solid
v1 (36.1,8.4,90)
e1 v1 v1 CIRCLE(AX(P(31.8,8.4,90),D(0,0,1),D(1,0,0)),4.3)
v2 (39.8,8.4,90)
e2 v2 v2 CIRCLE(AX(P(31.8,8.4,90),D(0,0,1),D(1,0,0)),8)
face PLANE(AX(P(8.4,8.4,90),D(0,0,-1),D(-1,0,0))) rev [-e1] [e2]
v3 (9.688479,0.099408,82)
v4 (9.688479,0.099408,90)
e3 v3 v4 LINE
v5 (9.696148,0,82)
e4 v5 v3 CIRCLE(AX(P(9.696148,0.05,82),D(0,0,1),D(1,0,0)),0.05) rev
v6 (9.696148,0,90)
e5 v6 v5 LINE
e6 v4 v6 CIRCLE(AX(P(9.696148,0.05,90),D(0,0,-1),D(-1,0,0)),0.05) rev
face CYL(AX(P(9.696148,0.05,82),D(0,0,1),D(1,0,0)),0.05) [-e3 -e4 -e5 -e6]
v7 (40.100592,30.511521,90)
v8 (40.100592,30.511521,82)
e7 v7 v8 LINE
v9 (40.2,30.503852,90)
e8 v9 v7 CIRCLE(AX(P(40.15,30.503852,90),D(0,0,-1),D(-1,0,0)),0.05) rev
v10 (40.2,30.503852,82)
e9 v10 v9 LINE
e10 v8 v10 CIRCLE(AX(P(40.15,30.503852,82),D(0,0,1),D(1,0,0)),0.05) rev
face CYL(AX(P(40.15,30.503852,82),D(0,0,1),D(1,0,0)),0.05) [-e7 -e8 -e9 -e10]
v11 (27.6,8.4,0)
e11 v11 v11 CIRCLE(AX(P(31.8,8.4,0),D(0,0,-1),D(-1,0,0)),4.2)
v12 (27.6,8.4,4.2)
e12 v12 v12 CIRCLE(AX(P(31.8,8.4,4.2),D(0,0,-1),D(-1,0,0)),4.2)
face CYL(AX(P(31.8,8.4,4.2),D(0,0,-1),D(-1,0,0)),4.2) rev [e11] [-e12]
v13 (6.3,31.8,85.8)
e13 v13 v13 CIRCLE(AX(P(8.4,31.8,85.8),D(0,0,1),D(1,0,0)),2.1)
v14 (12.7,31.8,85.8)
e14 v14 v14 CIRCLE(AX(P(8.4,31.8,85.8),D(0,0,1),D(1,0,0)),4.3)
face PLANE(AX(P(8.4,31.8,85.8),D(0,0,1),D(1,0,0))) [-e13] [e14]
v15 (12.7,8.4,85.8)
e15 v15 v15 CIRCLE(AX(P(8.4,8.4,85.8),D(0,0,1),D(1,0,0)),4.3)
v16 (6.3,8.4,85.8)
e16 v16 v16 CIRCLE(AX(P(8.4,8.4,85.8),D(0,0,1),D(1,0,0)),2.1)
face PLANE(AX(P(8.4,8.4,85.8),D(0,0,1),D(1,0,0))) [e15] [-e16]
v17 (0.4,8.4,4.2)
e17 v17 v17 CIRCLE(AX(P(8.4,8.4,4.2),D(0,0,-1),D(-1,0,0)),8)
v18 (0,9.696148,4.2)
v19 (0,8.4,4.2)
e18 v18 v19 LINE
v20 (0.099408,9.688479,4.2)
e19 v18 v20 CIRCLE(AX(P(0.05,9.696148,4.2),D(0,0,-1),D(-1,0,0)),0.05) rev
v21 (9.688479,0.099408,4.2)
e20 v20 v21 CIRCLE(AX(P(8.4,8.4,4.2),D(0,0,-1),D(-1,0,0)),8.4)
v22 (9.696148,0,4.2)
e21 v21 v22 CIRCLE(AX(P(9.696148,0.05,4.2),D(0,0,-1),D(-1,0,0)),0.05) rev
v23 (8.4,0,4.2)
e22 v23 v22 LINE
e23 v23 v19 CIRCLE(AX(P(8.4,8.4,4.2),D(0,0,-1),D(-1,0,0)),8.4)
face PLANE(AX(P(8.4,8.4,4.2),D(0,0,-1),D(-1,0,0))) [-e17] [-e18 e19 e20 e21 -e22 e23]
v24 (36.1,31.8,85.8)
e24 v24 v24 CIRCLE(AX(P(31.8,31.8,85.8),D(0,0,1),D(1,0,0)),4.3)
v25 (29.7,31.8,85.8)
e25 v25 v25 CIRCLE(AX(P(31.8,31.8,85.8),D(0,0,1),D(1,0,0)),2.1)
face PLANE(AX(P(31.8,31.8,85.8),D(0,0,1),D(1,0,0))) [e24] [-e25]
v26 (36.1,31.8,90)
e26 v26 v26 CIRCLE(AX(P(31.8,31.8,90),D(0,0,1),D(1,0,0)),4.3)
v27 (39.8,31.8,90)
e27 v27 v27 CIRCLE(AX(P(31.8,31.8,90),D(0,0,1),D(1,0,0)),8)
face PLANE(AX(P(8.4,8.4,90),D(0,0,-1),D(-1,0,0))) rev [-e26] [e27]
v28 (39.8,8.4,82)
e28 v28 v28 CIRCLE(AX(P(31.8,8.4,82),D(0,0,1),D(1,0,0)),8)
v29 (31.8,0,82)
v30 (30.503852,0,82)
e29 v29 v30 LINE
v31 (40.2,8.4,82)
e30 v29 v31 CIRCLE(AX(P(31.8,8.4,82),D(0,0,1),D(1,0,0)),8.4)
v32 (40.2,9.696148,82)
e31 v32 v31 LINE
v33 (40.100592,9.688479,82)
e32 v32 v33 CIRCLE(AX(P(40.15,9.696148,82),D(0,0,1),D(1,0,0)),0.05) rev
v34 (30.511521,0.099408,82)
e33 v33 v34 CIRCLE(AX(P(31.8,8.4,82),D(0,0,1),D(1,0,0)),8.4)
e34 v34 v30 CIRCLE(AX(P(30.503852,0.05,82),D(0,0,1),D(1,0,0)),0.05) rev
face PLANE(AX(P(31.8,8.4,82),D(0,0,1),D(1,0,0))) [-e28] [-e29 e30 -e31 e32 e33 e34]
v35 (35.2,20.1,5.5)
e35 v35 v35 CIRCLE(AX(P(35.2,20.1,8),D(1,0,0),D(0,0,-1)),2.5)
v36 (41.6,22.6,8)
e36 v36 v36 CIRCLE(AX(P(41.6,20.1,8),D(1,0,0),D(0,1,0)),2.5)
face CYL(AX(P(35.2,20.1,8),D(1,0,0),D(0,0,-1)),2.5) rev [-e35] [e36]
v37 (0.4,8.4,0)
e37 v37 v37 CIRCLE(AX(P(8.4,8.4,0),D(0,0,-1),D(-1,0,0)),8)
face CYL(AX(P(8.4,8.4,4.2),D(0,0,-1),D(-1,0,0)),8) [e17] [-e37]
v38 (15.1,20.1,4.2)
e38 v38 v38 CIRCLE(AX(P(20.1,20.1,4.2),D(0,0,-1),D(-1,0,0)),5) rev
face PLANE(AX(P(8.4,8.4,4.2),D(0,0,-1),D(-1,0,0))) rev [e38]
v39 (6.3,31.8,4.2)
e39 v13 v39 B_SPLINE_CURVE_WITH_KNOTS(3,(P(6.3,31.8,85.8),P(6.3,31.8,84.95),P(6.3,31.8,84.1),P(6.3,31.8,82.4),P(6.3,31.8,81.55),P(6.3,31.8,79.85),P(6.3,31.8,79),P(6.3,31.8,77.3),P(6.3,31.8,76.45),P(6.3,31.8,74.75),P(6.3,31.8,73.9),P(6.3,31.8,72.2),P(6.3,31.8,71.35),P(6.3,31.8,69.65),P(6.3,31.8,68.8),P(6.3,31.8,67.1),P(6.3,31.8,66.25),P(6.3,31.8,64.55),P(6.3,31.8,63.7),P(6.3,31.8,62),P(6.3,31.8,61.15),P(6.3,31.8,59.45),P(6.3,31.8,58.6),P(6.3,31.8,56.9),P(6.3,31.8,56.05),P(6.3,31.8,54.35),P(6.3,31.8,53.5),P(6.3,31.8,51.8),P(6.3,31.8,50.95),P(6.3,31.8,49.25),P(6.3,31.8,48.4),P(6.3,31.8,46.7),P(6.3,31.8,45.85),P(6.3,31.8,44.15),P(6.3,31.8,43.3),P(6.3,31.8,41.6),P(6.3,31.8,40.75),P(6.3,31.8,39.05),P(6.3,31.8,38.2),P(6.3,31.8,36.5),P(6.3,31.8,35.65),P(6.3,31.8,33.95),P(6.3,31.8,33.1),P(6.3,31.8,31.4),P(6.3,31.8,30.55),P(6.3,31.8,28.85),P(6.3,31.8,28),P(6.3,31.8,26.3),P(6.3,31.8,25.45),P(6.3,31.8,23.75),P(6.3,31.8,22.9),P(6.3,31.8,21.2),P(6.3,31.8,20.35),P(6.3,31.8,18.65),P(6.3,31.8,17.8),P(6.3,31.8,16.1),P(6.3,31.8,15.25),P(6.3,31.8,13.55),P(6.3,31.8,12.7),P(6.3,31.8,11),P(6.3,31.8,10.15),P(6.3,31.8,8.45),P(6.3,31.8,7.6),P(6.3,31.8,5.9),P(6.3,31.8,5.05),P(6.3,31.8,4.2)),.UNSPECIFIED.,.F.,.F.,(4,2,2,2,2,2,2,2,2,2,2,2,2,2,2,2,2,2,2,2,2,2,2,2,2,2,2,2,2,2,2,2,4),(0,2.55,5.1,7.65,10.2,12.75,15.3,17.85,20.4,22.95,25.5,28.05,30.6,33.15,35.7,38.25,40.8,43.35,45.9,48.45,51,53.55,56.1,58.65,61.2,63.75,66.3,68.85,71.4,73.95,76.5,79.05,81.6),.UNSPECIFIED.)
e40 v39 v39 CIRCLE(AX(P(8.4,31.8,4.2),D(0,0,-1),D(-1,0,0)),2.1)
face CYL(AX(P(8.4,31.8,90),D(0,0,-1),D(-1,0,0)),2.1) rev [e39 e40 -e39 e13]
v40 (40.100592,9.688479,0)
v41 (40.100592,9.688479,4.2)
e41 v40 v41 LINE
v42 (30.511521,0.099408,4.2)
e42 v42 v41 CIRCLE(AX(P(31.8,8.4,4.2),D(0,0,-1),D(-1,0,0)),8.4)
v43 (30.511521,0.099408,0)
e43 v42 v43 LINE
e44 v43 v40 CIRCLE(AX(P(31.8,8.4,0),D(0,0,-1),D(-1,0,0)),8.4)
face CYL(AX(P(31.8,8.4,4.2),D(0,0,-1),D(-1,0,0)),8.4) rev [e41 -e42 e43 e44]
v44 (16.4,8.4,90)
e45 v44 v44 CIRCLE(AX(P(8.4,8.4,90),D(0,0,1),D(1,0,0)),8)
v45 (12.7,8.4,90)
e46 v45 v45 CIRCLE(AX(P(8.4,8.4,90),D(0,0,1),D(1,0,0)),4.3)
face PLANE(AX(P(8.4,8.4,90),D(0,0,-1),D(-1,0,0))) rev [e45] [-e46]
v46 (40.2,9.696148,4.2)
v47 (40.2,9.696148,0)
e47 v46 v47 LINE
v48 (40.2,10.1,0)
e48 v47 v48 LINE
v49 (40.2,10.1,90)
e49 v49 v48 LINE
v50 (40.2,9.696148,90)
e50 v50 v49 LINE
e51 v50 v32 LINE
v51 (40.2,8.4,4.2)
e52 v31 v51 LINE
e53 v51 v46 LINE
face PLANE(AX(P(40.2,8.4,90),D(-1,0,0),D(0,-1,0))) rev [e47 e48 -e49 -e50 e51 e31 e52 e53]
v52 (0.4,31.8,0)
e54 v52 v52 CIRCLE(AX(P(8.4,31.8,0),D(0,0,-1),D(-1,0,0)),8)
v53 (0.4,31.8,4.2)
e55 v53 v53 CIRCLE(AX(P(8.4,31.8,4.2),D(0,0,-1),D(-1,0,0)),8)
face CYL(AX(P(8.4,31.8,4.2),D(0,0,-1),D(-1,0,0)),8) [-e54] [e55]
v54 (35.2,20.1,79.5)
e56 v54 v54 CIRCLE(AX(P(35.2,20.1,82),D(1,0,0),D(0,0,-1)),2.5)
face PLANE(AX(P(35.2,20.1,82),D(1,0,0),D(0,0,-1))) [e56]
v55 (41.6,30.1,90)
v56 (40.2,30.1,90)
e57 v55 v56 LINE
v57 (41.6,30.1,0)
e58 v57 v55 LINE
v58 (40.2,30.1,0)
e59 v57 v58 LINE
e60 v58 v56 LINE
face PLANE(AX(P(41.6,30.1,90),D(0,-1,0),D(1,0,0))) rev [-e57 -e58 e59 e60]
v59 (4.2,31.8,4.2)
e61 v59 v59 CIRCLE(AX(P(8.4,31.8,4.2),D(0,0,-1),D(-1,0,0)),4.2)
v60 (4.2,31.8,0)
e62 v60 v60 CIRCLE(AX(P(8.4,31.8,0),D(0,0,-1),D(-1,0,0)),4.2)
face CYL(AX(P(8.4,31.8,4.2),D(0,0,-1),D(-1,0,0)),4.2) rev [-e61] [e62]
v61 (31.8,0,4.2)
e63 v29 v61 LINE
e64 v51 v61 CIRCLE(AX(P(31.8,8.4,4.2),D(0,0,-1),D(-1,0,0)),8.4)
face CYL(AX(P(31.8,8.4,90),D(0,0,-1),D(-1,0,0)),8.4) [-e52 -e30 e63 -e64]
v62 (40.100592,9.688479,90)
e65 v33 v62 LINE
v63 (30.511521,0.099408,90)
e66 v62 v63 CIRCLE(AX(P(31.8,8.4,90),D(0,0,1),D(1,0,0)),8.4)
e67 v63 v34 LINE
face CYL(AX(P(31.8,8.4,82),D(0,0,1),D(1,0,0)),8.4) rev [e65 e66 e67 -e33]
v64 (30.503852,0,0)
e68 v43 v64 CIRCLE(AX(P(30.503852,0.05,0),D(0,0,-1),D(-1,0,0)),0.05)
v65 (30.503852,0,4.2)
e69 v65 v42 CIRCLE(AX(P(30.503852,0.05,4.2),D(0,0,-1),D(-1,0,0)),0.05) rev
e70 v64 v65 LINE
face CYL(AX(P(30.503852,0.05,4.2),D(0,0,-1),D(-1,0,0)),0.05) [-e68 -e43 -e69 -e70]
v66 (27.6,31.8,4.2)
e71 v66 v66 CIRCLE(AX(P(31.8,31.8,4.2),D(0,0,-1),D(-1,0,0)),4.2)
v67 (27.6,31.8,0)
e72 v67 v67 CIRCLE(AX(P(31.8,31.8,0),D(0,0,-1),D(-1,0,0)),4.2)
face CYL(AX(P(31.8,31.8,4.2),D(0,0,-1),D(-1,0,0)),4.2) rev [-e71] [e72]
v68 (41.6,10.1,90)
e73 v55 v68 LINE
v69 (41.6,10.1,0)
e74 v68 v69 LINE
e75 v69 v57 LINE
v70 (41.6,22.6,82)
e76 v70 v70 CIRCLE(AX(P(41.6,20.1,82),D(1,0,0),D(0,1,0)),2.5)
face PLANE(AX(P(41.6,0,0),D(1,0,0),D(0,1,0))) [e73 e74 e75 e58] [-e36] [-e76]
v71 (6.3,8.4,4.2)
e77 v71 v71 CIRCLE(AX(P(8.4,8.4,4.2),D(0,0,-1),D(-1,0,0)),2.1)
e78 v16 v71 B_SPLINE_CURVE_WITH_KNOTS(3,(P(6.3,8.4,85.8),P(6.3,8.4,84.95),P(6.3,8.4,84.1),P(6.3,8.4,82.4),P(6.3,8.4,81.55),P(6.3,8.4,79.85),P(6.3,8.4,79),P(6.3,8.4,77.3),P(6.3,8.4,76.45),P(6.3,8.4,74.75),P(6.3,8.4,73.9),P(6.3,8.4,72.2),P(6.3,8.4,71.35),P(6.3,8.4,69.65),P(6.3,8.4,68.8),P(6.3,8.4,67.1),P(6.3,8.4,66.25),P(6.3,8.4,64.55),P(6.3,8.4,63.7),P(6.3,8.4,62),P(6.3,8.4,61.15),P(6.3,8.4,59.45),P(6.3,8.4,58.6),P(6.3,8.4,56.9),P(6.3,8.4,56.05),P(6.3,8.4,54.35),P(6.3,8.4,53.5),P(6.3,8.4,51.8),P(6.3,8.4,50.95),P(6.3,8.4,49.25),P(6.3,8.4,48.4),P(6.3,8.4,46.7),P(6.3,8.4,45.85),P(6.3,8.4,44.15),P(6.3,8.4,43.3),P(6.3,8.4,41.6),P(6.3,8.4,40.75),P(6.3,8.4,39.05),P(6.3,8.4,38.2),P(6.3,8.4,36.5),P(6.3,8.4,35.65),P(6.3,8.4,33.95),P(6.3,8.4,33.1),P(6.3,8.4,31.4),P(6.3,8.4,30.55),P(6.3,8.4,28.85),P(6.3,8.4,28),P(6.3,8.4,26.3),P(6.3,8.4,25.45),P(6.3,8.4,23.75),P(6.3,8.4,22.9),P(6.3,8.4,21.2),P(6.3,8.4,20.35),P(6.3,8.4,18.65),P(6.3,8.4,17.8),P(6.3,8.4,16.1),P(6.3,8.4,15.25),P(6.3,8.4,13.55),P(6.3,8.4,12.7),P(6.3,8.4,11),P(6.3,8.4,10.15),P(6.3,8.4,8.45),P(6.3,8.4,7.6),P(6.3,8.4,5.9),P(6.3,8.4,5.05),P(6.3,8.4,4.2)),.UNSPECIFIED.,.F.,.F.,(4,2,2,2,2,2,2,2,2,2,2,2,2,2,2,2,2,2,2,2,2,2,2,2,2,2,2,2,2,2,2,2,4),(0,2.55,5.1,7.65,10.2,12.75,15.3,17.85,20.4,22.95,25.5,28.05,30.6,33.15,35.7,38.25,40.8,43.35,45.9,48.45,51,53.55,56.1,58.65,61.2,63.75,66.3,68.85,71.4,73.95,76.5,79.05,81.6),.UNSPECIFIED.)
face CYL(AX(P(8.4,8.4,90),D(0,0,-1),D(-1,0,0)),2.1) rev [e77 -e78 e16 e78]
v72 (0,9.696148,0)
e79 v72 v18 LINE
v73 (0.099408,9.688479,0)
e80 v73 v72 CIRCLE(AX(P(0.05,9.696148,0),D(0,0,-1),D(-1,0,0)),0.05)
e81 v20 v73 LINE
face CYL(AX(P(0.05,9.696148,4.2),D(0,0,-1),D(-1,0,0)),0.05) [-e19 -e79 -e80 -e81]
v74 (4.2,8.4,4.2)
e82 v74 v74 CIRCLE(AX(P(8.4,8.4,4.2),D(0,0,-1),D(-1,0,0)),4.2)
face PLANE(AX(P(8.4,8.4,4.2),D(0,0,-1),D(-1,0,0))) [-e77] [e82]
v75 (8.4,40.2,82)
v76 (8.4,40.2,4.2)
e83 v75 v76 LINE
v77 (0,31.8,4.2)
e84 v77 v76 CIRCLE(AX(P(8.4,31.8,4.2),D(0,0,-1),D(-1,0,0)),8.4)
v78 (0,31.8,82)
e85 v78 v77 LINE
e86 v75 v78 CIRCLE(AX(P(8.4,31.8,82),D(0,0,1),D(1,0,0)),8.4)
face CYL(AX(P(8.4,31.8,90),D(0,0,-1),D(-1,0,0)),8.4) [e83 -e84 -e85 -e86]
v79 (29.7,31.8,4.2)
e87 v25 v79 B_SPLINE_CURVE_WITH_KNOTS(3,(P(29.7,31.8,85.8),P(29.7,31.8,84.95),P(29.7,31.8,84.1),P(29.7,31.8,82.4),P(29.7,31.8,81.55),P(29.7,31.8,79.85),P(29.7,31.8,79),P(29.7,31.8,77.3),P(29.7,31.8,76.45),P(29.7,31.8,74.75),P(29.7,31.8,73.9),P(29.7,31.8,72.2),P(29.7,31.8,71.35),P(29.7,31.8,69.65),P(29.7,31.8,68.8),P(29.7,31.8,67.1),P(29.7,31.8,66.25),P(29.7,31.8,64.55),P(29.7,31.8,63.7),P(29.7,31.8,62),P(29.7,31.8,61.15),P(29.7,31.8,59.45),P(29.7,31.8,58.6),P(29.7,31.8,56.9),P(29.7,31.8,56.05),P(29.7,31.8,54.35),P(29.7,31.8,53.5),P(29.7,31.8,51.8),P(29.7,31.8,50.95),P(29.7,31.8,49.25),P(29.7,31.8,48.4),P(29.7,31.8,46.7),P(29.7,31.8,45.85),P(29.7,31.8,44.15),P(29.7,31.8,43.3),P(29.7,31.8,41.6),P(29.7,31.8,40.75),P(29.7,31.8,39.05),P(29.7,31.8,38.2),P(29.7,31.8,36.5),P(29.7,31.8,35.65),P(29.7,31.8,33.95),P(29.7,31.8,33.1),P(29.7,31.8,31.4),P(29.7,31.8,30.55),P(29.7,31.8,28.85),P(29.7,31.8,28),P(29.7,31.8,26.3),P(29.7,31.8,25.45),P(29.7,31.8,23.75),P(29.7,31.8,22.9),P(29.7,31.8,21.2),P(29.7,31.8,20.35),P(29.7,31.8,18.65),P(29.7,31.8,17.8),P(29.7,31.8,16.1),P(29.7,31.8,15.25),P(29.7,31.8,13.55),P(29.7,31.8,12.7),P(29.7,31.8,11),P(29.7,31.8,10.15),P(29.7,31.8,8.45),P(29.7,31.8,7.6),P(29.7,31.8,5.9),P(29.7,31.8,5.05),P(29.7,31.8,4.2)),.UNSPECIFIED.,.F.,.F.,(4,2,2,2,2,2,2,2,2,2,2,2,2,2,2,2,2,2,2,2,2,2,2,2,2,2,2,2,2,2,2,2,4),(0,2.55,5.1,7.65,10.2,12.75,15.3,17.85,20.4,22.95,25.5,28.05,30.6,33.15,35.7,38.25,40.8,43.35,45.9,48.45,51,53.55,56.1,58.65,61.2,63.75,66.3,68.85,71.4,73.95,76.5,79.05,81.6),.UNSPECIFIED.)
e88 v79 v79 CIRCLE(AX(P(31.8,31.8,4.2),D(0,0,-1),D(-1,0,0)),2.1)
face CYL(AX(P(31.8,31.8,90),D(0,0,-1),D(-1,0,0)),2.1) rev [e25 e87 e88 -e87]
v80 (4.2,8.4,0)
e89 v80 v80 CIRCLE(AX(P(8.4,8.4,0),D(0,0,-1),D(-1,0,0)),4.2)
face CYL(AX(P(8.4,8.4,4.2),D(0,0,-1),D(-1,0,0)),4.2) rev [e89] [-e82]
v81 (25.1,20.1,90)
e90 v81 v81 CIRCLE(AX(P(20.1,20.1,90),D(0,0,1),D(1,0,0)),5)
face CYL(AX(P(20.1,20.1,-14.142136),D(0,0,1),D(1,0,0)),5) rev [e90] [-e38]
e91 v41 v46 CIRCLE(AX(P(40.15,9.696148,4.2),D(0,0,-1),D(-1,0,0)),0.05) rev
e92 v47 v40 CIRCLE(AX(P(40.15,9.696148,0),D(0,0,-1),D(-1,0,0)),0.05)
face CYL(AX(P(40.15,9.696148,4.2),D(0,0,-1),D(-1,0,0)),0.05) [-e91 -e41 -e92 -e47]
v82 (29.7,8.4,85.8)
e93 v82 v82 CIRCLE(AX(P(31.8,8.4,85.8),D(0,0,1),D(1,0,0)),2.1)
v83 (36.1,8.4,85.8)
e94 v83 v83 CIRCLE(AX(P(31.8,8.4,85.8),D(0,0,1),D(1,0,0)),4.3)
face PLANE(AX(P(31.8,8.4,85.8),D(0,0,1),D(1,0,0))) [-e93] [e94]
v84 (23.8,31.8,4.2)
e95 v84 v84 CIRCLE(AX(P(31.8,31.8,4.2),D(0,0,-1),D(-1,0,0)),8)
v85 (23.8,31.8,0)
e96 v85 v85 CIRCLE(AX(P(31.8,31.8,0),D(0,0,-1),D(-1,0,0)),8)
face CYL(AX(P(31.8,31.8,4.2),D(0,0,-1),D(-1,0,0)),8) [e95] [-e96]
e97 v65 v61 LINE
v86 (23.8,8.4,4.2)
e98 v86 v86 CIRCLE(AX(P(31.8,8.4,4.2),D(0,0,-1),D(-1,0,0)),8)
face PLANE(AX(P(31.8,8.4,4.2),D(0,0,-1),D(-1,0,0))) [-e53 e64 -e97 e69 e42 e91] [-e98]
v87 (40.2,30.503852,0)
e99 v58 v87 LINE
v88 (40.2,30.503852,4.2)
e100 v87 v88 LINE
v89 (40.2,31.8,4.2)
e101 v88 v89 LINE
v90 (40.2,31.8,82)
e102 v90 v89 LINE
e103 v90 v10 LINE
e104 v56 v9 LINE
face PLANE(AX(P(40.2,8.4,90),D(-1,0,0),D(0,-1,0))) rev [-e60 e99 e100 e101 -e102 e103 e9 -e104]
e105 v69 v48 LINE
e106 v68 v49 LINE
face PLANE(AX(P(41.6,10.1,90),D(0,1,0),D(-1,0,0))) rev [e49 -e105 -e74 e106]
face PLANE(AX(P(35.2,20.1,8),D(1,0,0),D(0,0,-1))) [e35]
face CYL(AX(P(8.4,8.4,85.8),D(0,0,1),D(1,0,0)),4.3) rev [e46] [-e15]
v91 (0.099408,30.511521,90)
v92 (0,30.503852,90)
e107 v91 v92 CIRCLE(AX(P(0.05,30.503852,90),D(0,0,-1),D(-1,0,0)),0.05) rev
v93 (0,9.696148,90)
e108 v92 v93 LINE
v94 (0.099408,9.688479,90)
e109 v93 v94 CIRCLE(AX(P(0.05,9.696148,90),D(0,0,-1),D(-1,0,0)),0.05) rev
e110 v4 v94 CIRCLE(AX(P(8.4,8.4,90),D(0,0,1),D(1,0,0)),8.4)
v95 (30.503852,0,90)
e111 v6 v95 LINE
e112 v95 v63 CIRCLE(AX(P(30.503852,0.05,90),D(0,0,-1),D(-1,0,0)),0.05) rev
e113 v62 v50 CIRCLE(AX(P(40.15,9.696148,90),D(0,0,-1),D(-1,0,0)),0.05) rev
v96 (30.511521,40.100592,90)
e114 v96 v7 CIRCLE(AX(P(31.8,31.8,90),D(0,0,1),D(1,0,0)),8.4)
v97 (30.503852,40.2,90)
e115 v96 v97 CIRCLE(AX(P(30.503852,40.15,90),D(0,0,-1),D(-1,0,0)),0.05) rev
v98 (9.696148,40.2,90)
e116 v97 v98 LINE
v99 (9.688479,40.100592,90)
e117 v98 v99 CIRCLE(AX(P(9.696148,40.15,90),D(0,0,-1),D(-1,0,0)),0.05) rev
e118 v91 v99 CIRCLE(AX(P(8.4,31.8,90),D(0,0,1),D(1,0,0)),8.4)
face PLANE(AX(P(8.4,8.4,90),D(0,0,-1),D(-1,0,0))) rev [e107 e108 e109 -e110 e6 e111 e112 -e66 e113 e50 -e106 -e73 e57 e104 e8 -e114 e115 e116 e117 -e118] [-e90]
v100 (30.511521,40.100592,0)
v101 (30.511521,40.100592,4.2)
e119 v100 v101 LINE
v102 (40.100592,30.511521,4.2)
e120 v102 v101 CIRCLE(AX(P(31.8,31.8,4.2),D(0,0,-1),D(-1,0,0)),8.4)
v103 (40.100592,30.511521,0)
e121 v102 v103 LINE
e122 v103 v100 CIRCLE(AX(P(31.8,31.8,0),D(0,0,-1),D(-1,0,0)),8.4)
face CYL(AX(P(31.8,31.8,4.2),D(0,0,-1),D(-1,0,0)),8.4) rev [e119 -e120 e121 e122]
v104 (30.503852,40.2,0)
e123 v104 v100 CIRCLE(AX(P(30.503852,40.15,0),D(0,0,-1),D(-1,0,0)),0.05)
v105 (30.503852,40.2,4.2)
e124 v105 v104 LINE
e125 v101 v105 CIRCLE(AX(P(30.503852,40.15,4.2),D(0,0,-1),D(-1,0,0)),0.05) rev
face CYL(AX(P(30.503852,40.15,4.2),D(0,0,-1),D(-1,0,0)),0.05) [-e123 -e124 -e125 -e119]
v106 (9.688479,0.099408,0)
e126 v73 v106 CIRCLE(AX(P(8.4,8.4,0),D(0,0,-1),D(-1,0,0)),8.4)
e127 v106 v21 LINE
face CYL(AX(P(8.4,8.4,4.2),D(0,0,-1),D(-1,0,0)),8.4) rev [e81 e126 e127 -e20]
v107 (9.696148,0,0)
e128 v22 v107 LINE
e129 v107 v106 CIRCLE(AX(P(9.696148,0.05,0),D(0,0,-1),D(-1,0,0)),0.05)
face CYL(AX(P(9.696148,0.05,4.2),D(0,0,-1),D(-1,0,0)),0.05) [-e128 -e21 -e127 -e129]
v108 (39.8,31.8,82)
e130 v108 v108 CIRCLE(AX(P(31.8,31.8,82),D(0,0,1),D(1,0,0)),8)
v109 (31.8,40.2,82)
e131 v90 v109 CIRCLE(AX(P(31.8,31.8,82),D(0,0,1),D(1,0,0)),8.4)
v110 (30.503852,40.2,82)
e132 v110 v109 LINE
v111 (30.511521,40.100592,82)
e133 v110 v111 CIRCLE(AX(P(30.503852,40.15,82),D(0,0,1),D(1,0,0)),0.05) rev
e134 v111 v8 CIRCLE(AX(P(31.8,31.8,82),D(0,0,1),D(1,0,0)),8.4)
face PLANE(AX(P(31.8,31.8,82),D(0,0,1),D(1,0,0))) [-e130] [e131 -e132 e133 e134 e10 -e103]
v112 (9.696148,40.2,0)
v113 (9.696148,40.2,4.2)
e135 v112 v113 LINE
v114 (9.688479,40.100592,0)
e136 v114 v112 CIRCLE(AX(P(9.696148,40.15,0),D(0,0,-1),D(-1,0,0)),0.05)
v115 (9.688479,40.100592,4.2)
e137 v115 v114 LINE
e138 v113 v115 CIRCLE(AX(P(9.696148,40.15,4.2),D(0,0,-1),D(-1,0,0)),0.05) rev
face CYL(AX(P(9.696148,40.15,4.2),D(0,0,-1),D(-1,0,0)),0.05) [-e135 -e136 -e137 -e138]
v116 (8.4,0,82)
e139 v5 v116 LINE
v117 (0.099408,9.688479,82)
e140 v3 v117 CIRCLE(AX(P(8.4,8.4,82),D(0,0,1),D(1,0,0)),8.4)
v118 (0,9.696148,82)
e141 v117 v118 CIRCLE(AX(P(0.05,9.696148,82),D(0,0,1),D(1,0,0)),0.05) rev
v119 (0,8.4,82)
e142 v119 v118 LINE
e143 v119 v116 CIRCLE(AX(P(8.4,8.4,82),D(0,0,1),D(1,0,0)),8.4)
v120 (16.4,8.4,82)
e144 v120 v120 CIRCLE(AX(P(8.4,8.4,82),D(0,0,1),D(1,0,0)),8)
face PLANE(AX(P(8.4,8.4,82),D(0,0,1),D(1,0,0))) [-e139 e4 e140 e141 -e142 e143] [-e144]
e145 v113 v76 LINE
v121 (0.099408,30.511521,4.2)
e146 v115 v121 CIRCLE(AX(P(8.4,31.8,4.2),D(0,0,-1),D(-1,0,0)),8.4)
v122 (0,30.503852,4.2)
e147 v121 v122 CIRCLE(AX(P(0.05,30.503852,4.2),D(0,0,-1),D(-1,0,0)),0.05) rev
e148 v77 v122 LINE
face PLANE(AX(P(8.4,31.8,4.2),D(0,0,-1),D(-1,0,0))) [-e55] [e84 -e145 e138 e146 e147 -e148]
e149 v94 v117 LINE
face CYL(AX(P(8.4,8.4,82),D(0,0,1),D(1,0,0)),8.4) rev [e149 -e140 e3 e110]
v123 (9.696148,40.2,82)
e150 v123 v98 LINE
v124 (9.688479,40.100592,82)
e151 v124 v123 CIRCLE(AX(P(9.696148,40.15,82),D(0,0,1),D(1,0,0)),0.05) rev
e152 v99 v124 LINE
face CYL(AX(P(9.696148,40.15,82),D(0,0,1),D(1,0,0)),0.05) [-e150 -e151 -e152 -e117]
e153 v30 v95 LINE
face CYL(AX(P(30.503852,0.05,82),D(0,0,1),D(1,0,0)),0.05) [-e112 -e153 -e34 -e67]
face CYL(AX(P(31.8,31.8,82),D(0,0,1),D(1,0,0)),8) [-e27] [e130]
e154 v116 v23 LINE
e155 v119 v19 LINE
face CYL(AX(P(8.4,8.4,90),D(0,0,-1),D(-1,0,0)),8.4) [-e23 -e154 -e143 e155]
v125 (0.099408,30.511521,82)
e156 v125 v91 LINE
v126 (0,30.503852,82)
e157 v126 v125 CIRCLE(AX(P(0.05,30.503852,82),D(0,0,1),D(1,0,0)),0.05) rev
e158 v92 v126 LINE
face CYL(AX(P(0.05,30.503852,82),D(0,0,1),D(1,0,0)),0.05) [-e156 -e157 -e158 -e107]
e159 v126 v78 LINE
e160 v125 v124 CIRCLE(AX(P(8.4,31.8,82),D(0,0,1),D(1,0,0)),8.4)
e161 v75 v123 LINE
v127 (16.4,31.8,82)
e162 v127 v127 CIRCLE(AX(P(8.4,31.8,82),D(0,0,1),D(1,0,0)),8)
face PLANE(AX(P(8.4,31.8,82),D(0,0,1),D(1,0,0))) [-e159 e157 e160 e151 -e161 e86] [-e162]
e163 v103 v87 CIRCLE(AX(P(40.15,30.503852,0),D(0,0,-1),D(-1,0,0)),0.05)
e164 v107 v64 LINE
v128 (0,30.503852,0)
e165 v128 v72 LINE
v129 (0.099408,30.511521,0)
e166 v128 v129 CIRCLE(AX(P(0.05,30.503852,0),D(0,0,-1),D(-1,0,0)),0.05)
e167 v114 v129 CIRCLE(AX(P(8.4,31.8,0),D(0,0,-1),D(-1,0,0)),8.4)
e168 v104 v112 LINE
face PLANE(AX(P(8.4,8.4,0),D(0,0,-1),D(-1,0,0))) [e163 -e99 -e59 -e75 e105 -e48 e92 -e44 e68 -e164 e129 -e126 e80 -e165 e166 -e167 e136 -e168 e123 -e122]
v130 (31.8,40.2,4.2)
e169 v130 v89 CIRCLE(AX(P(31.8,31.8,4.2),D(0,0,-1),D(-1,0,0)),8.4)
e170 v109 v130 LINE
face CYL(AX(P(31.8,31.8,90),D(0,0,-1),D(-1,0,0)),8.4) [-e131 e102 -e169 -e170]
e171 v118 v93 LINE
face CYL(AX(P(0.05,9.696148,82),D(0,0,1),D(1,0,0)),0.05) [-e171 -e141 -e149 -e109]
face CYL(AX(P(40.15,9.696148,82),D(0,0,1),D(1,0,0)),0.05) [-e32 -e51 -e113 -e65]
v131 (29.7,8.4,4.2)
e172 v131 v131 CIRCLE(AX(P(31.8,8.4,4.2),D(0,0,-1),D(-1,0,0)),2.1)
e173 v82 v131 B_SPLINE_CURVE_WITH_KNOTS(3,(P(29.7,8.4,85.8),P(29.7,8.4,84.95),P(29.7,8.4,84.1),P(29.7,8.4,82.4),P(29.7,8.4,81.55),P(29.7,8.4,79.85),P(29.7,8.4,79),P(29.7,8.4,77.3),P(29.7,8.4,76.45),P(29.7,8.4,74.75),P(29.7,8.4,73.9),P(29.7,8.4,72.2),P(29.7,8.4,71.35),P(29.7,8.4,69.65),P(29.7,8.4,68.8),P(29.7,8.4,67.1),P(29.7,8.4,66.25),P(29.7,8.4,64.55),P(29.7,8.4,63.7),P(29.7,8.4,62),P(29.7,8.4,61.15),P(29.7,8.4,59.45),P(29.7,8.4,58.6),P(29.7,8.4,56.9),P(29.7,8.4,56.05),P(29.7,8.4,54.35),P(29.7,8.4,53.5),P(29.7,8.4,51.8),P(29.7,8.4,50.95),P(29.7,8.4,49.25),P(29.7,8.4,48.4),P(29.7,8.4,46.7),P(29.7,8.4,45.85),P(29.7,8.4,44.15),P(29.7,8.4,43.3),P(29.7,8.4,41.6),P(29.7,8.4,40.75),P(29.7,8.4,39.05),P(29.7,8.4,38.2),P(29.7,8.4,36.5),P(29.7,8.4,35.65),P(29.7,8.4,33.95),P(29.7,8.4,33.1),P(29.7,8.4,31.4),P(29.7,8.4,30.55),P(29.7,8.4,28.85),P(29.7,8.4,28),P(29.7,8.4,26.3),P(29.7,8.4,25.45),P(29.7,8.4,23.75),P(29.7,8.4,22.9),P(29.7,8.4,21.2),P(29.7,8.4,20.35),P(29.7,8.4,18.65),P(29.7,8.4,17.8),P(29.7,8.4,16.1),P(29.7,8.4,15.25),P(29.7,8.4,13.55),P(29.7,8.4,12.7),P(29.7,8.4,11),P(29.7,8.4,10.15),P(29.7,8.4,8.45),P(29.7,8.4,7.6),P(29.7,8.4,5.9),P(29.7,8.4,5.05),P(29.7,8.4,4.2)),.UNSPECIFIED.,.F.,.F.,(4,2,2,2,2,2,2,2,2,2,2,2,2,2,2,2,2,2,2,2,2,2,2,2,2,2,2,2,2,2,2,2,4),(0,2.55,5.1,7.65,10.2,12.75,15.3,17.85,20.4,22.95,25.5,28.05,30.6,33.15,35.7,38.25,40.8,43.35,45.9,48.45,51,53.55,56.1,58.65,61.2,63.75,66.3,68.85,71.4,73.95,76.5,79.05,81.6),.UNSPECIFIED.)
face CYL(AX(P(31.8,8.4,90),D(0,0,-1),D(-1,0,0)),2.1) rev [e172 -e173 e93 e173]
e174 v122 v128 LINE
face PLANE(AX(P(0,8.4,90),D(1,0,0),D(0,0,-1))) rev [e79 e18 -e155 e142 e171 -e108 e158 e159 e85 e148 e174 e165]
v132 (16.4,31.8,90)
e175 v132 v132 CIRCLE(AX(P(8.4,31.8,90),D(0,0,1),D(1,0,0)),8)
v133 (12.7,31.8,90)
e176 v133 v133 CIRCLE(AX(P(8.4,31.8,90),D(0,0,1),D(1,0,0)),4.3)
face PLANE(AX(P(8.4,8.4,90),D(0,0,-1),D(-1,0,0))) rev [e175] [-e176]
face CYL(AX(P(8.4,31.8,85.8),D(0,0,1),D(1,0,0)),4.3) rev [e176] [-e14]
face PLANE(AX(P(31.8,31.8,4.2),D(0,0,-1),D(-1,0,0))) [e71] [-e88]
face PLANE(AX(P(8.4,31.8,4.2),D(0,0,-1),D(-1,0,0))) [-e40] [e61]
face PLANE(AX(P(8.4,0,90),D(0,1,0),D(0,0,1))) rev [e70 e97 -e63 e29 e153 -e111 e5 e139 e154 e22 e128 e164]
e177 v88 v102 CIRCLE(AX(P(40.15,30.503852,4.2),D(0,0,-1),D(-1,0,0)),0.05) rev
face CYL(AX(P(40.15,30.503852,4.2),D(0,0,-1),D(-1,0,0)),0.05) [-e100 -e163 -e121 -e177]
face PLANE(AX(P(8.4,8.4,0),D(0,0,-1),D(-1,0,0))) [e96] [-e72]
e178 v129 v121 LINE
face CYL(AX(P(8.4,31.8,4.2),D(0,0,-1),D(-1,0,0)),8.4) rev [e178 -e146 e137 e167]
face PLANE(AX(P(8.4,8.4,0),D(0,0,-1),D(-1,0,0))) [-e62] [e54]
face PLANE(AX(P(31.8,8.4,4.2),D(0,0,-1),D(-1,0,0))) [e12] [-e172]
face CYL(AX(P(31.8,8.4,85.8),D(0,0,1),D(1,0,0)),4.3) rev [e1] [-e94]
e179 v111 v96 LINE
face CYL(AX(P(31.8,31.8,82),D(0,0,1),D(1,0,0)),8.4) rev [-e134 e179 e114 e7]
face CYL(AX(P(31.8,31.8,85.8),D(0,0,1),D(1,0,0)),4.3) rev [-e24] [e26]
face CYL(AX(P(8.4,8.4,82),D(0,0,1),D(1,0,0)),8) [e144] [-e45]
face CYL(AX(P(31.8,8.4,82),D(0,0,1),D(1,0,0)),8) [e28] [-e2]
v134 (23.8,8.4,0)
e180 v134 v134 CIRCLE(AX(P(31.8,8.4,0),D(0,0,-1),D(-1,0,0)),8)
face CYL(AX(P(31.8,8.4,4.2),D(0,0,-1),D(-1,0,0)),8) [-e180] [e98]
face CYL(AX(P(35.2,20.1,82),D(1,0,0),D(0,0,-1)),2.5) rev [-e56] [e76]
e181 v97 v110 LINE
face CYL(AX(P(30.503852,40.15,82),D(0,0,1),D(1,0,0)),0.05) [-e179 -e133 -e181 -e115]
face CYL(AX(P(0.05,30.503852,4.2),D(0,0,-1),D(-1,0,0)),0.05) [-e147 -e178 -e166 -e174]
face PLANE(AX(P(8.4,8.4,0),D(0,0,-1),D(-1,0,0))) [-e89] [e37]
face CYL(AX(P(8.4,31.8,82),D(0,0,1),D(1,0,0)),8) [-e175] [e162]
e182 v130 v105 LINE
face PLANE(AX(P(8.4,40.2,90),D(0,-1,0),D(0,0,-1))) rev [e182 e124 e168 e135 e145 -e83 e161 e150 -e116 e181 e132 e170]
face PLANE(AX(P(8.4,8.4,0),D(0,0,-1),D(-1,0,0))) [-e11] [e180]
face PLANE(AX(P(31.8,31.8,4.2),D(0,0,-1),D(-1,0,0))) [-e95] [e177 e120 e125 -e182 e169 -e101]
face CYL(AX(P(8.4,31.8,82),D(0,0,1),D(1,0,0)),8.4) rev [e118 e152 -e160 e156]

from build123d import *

# Parameters (mm, degrees)
SKETCH1_R           = 2.1
BOSS_EXTRUDE1_DEPTH = 90
SKETCH5_R           = 2.5
CUT_EXTRUDE1_DEPTH  = 5
SKETCH6_R           = 8.4
SKETCH6_R_2         = 8
CUT_EXTRUDE2_DEPTH  = 4.2
FILLET1_START       = -1
FILLET1_DEPTH       = 5.2
CUT_EXTRUDE3_START  = -8
SKETCH7_R           = 8.4
SKETCH7_R_2         = 8
CUT_EXTRUDE3_DEPTH  = 8
SKETCH8_R           = 4.3
CUT_EXTRUDE4_DEPTH  = 4.2
FILLET2_START       = 82
FILLET2_DEPTH       = 9
SKETCH9_R           = 5
CUT_EXTRUDE5_DEPTH  = 85.8
SKETCH10_R          = 4.2
CUT_EXTRUDE6_DEPTH  = 4.2
BOSS_EXTRUDE2_START = 1.4
SKETCH11_W          = 90
SKETCH11_H          = 20
SKETCH11_R          = 2.5
BOSS_EXTRUDE2_DEPTH = 1.4


with BuildPart() as part:
    # Sketch1 → Boss-Extrude1 (new body)
    with BuildSketch(Plane.XY):
        with BuildLine():
            Line((8.4, 0), (31.8, 0))
            ThreePointArc((31.8, 0), (37.739696962, 2.460303038), (40.2, 8.4))
            Line((40.2, 8.4), (40.2, 31.8))
            ThreePointArc((40.2, 31.8), (37.739696962, 37.739696962), (31.8, 40.2))
            Line((31.8, 40.2), (8.4, 40.2))
            ThreePointArc((8.4, 40.2), (2.460303038, 37.739696962), (0, 31.8))
            Line((0, 31.8), (0, 8.4))
            ThreePointArc((0, 8.4), (2.460303038, 2.460303038), (8.4, 0))
        make_face()
        with Locations(Location((8.4, 31.8, 0), (0, 0, 180))):
            Circle(SKETCH1_R, mode=Mode.SUBTRACT)
        with Locations(Location((31.8, 31.8, 0), (0, 0, 180))):
            Circle(SKETCH1_R, mode=Mode.SUBTRACT)
        with Locations(Location((31.8, 8.4, 0), (0, 0, 180))):
            Circle(SKETCH1_R, mode=Mode.SUBTRACT)
        with Locations(Location((8.4, 8.4, 0), (0, 0, 180))):
            Circle(SKETCH1_R, mode=Mode.SUBTRACT)
    extrude(amount=BOSS_EXTRUDE1_DEPTH)

    # Sketch5 → Cut-Extrude1 (cut)
    with BuildSketch(Plane(origin=(40.2, 0, 0), x_dir=(0, 0, -1), z_dir=(1, 0, 0))):
        with Locations((-82, 20.1)):
            Circle(SKETCH5_R)
        with Locations((-8, 20.1)):
            Circle(SKETCH5_R)
    extrude(amount=-CUT_EXTRUDE1_DEPTH, mode=Mode.SUBTRACT)

    # Sketch6 → Cut-Extrude2 (cut)
    # profile 1 of 4: a face of its own
    with BuildSketch(Plane(origin=(0, 0, 0), x_dir=(-1, 0, 0), z_dir=(0, 0, -1))):
        with Locations((-31.8, 31.8)):
            Circle(SKETCH6_R)
        with Locations((-31.8, 31.8)):
            Circle(SKETCH6_R_2, mode=Mode.SUBTRACT)
    # profile 2 of 4: a face of its own
    with BuildSketch(Plane(origin=(0, 0, 0), x_dir=(-1, 0, 0), z_dir=(0, 0, -1))):
        with Locations((-8.4, 31.8)):
            Circle(SKETCH6_R)
        with Locations((-8.4, 31.8)):
            Circle(SKETCH6_R_2, mode=Mode.SUBTRACT)
    # profile 3 of 4: a face of its own
    with BuildSketch(Plane(origin=(0, 0, 0), x_dir=(-1, 0, 0), z_dir=(0, 0, -1))):
        with Locations((-8.4, 8.4)):
            Circle(SKETCH6_R)
        with Locations((-8.4, 8.4)):
            Circle(SKETCH6_R_2, mode=Mode.SUBTRACT)
    # profile 4 of 4: a face of its own
    with BuildSketch(Plane(origin=(0, 0, 0), x_dir=(-1, 0, 0), z_dir=(0, 0, -1))):
        with Locations((-31.8, 8.4)):
            Circle(SKETCH6_R)
        with Locations((-31.8, 8.4)):
            Circle(SKETCH6_R_2, mode=Mode.SUBTRACT)
    extrude(amount=-CUT_EXTRUDE2_DEPTH, mode=Mode.SUBTRACT)

    # Fillet1: read off the stored shape, not the designer's step
    # Fillet1 outline → Fillet1 (cut)
    with BuildSketch(Plane.XY.offset(FILLET1_START)):
        with BuildLine():
            ThreePointArc((0, 8.4), (0.024888944, 9.046153846), (0.099408284, 9.688478624))
            ThreePointArc((0.099408284, 9.688478624), (0.046153846, 9.646296288), (0, 9.69614814))
            Line((0, 9.69614814), (0, 8.4))
        make_face()
        with BuildLine():
            ThreePointArc((9.69614814, 0), (9.646296288, 0.046153846), (9.688478624, 0.099408284))
            ThreePointArc((9.688478624, 0.099408284), (9.046153846, 0.024888944), (8.4, 0))
            Line((8.4, 0), (9.69614814, 0))
        make_face()
        with BuildLine():
            Line((0, 31.8), (0, 30.50385186))
            ThreePointArc((0, 30.50385186), (0.046153846, 30.553703712), (0.099408284, 30.511521376))
            ThreePointArc((0.099408284, 30.511521376), (0.024888944, 31.153846154), (0, 31.8))
        make_face()
        with BuildLine():
            ThreePointArc((30.511521376, 0.099408284), (30.553703712, 0.046153846), (30.50385186, 0))
            Line((30.50385186, 0), (31.8, 0))
            ThreePointArc((31.8, 0), (31.153846154, 0.024888944), (30.511521376, 0.099408284))
        make_face()
        with BuildLine():
            ThreePointArc((8.4, 40.2), (9.046153846, 40.175111056), (9.688478624, 40.100591716))
            ThreePointArc((9.688478624, 40.100591716), (9.646296288, 40.153846154), (9.69614814, 40.2))
            Line((9.69614814, 40.2), (8.4, 40.2))
        make_face()
        with BuildLine():
            ThreePointArc((40.2, 9.69614814), (40.153846154, 9.646296288), (40.100591716, 9.688478624))
            ThreePointArc((40.100591716, 9.688478624), (40.175111056, 9.046153846), (40.2, 8.4))
            Line((40.2, 8.4), (40.2, 9.69614814))
        make_face()
        with BuildLine():
            Line((31.8, 40.2), (30.50385186, 40.2))
            ThreePointArc((30.50385186, 40.2), (30.553703712, 40.153846154), (30.511521376, 40.100591716))
            ThreePointArc((30.511521376, 40.100591716), (31.153846154, 40.175111056), (31.8, 40.2))
        make_face()
        with BuildLine():
            ThreePointArc((40.100591716, 30.511521376), (40.153846154, 30.553703712), (40.2, 30.50385186))
            Line((40.2, 30.50385186), (40.2, 31.8))
            ThreePointArc((40.2, 31.8), (40.175111056, 31.153846154), (40.100591716, 30.511521376))
        make_face()
    extrude(amount=FILLET1_DEPTH, mode=Mode.SUBTRACT)

    # Sketch7 → Cut-Extrude3 (cut)
    # profile 1 of 4: a face of its own
    with BuildSketch(Plane.XY.offset(90).offset(CUT_EXTRUDE3_START)):
        with Locations((8.4, 31.8)):
            Circle(SKETCH7_R)
        with Locations(Location((8.4, 31.8, 0), (0, 0, 180))):
            Circle(SKETCH7_R_2, mode=Mode.SUBTRACT)
    # profile 2 of 4: a face of its own
    with BuildSketch(Plane.XY.offset(90).offset(CUT_EXTRUDE3_START)):
        with Locations((31.8, 31.8)):
            Circle(SKETCH7_R)
        with Locations(Location((31.8, 31.8, 0), (0, 0, 180))):
            Circle(SKETCH7_R_2, mode=Mode.SUBTRACT)
    # profile 3 of 4: a face of its own
    with BuildSketch(Plane.XY.offset(90).offset(CUT_EXTRUDE3_START)):
        with Locations((31.8, 8.4)):
            Circle(SKETCH7_R)
        with Locations(Location((31.8, 8.4, 0), (0, 0, 180))):
            Circle(SKETCH7_R_2, mode=Mode.SUBTRACT)
    # profile 4 of 4: a face of its own
    with BuildSketch(Plane.XY.offset(90).offset(CUT_EXTRUDE3_START)):
        with Locations((8.4, 8.4)):
            Circle(SKETCH7_R)
        with Locations(Location((8.4, 8.4, 0), (0, 0, 180))):
            Circle(SKETCH7_R_2, mode=Mode.SUBTRACT)
    extrude(amount=CUT_EXTRUDE3_DEPTH, mode=Mode.SUBTRACT)

    # Sketch8 → Cut-Extrude4 (cut)
    with BuildSketch(Plane.XY.offset(90)):
        with Locations((8.4, 31.8)):
            Circle(SKETCH8_R)
        with Locations((31.8, 31.8)):
            Circle(SKETCH8_R)
        with Locations((31.8, 8.4)):
            Circle(SKETCH8_R)
        with Locations((8.4, 8.4)):
            Circle(SKETCH8_R)
    extrude(amount=-CUT_EXTRUDE4_DEPTH, mode=Mode.SUBTRACT)

    # Fillet2: read off the stored shape, not the designer's step
    # Fillet2 outline → Fillet2 (cut)
    with BuildSketch(Plane.XY.offset(FILLET2_START)):
        with BuildLine():
            ThreePointArc((0.099408284, 9.688478624), (0.046153846, 9.646296288), (0, 9.69614814))
            Line((0, 9.69614814), (0, 8.4))
            ThreePointArc((0, 8.4), (0.024888944, 9.046153846), (0.099408284, 9.688478624))
        make_face()
        with BuildLine():
            Line((0, 31.8), (0, 30.50385186))
            ThreePointArc((0, 30.50385186), (0.046153846, 30.553703712), (0.099408284, 30.511521376))
            ThreePointArc((0.099408284, 30.511521376), (0.024888944, 31.153846154), (0, 31.8))
        make_face()
        with BuildLine():
            ThreePointArc((9.69614814, 0), (9.646296288, 0.046153846), (9.688478624, 0.099408284))
            ThreePointArc((9.688478624, 0.099408284), (9.046153846, 0.024888944), (8.4, 0))
            Line((8.4, 0), (9.69614814, 0))
        make_face()
        with BuildLine():
            ThreePointArc((8.4, 40.2), (9.046153846, 40.175111056), (9.688478624, 40.100591716))
            ThreePointArc((9.688478624, 40.100591716), (9.646296288, 40.153846154), (9.69614814, 40.2))
            Line((9.69614814, 40.2), (8.4, 40.2))
        make_face()
        with BuildLine():
            ThreePointArc((30.511521376, 0.099408284), (30.553703712, 0.046153846), (30.50385186, 0))
            Line((30.50385186, 0), (31.8, 0))
            ThreePointArc((31.8, 0), (31.153846154, 0.024888944), (30.511521376, 0.099408284))
        make_face()
        with BuildLine():
            Line((31.8, 40.2), (30.50385186, 40.2))
            ThreePointArc((30.50385186, 40.2), (30.553703712, 40.153846154), (30.511521376, 40.100591716))
            ThreePointArc((30.511521376, 40.100591716), (31.153846154, 40.175111056), (31.8, 40.2))
        make_face()
        with BuildLine():
            ThreePointArc((40.2, 9.69614814), (40.153846154, 9.646296288), (40.100591716, 9.688478624))
            ThreePointArc((40.100591716, 9.688478624), (40.175111056, 9.046153846), (40.2, 8.4))
            Line((40.2, 8.4), (40.2, 9.69614814))
        make_face()
        with BuildLine():
            ThreePointArc((40.2, 31.8), (40.175111056, 31.153846154), (40.100591716, 30.511521376))
            ThreePointArc((40.100591716, 30.511521376), (40.153846154, 30.553703712), (40.2, 30.50385186))
            Line((40.2, 30.50385186), (40.2, 31.8))
        make_face()
    extrude(amount=FILLET2_DEPTH, mode=Mode.SUBTRACT)

    # Sketch9 → Cut-Extrude5 (cut)
    with BuildSketch(Plane.XY.offset(90)):
        with Locations((20.1, 20.1)):
            Circle(SKETCH9_R)
    extrude(amount=-CUT_EXTRUDE5_DEPTH, mode=Mode.SUBTRACT)

    # Sketch10 → Cut-Extrude6 (cut)
    with BuildSketch(Plane(origin=(0, 0, 0), x_dir=(-1, 0, 0), z_dir=(0, 0, -1))):
        with Locations((-31.8, 31.8)):
            Circle(SKETCH10_R)
        with Locations((-8.4, 31.8)):
            Circle(SKETCH10_R)
        with Locations((-31.8, 8.4)):
            Circle(SKETCH10_R)
        with Locations((-8.4, 8.4)):
            Circle(SKETCH10_R)
    extrude(amount=-CUT_EXTRUDE6_DEPTH, mode=Mode.SUBTRACT)

    # Sketch11 → Boss-Extrude2 (add)
    with BuildSketch(Plane(origin=(40.2, 0, 0), x_dir=(0, 0, -1), z_dir=(1, 0, 0)).offset(BOSS_EXTRUDE2_START)):
        with Locations((-45, 20.1)):
            Rectangle(SKETCH11_W, SKETCH11_H)
        with Locations((-82, 20.1)):
            Circle(SKETCH11_R, mode=Mode.SUBTRACT)
        with Locations((-8, 20.1)):
            Circle(SKETCH11_R, mode=Mode.SUBTRACT)
    extrude(amount=-BOSS_EXTRUDE2_DEPTH)


solid = part.part
